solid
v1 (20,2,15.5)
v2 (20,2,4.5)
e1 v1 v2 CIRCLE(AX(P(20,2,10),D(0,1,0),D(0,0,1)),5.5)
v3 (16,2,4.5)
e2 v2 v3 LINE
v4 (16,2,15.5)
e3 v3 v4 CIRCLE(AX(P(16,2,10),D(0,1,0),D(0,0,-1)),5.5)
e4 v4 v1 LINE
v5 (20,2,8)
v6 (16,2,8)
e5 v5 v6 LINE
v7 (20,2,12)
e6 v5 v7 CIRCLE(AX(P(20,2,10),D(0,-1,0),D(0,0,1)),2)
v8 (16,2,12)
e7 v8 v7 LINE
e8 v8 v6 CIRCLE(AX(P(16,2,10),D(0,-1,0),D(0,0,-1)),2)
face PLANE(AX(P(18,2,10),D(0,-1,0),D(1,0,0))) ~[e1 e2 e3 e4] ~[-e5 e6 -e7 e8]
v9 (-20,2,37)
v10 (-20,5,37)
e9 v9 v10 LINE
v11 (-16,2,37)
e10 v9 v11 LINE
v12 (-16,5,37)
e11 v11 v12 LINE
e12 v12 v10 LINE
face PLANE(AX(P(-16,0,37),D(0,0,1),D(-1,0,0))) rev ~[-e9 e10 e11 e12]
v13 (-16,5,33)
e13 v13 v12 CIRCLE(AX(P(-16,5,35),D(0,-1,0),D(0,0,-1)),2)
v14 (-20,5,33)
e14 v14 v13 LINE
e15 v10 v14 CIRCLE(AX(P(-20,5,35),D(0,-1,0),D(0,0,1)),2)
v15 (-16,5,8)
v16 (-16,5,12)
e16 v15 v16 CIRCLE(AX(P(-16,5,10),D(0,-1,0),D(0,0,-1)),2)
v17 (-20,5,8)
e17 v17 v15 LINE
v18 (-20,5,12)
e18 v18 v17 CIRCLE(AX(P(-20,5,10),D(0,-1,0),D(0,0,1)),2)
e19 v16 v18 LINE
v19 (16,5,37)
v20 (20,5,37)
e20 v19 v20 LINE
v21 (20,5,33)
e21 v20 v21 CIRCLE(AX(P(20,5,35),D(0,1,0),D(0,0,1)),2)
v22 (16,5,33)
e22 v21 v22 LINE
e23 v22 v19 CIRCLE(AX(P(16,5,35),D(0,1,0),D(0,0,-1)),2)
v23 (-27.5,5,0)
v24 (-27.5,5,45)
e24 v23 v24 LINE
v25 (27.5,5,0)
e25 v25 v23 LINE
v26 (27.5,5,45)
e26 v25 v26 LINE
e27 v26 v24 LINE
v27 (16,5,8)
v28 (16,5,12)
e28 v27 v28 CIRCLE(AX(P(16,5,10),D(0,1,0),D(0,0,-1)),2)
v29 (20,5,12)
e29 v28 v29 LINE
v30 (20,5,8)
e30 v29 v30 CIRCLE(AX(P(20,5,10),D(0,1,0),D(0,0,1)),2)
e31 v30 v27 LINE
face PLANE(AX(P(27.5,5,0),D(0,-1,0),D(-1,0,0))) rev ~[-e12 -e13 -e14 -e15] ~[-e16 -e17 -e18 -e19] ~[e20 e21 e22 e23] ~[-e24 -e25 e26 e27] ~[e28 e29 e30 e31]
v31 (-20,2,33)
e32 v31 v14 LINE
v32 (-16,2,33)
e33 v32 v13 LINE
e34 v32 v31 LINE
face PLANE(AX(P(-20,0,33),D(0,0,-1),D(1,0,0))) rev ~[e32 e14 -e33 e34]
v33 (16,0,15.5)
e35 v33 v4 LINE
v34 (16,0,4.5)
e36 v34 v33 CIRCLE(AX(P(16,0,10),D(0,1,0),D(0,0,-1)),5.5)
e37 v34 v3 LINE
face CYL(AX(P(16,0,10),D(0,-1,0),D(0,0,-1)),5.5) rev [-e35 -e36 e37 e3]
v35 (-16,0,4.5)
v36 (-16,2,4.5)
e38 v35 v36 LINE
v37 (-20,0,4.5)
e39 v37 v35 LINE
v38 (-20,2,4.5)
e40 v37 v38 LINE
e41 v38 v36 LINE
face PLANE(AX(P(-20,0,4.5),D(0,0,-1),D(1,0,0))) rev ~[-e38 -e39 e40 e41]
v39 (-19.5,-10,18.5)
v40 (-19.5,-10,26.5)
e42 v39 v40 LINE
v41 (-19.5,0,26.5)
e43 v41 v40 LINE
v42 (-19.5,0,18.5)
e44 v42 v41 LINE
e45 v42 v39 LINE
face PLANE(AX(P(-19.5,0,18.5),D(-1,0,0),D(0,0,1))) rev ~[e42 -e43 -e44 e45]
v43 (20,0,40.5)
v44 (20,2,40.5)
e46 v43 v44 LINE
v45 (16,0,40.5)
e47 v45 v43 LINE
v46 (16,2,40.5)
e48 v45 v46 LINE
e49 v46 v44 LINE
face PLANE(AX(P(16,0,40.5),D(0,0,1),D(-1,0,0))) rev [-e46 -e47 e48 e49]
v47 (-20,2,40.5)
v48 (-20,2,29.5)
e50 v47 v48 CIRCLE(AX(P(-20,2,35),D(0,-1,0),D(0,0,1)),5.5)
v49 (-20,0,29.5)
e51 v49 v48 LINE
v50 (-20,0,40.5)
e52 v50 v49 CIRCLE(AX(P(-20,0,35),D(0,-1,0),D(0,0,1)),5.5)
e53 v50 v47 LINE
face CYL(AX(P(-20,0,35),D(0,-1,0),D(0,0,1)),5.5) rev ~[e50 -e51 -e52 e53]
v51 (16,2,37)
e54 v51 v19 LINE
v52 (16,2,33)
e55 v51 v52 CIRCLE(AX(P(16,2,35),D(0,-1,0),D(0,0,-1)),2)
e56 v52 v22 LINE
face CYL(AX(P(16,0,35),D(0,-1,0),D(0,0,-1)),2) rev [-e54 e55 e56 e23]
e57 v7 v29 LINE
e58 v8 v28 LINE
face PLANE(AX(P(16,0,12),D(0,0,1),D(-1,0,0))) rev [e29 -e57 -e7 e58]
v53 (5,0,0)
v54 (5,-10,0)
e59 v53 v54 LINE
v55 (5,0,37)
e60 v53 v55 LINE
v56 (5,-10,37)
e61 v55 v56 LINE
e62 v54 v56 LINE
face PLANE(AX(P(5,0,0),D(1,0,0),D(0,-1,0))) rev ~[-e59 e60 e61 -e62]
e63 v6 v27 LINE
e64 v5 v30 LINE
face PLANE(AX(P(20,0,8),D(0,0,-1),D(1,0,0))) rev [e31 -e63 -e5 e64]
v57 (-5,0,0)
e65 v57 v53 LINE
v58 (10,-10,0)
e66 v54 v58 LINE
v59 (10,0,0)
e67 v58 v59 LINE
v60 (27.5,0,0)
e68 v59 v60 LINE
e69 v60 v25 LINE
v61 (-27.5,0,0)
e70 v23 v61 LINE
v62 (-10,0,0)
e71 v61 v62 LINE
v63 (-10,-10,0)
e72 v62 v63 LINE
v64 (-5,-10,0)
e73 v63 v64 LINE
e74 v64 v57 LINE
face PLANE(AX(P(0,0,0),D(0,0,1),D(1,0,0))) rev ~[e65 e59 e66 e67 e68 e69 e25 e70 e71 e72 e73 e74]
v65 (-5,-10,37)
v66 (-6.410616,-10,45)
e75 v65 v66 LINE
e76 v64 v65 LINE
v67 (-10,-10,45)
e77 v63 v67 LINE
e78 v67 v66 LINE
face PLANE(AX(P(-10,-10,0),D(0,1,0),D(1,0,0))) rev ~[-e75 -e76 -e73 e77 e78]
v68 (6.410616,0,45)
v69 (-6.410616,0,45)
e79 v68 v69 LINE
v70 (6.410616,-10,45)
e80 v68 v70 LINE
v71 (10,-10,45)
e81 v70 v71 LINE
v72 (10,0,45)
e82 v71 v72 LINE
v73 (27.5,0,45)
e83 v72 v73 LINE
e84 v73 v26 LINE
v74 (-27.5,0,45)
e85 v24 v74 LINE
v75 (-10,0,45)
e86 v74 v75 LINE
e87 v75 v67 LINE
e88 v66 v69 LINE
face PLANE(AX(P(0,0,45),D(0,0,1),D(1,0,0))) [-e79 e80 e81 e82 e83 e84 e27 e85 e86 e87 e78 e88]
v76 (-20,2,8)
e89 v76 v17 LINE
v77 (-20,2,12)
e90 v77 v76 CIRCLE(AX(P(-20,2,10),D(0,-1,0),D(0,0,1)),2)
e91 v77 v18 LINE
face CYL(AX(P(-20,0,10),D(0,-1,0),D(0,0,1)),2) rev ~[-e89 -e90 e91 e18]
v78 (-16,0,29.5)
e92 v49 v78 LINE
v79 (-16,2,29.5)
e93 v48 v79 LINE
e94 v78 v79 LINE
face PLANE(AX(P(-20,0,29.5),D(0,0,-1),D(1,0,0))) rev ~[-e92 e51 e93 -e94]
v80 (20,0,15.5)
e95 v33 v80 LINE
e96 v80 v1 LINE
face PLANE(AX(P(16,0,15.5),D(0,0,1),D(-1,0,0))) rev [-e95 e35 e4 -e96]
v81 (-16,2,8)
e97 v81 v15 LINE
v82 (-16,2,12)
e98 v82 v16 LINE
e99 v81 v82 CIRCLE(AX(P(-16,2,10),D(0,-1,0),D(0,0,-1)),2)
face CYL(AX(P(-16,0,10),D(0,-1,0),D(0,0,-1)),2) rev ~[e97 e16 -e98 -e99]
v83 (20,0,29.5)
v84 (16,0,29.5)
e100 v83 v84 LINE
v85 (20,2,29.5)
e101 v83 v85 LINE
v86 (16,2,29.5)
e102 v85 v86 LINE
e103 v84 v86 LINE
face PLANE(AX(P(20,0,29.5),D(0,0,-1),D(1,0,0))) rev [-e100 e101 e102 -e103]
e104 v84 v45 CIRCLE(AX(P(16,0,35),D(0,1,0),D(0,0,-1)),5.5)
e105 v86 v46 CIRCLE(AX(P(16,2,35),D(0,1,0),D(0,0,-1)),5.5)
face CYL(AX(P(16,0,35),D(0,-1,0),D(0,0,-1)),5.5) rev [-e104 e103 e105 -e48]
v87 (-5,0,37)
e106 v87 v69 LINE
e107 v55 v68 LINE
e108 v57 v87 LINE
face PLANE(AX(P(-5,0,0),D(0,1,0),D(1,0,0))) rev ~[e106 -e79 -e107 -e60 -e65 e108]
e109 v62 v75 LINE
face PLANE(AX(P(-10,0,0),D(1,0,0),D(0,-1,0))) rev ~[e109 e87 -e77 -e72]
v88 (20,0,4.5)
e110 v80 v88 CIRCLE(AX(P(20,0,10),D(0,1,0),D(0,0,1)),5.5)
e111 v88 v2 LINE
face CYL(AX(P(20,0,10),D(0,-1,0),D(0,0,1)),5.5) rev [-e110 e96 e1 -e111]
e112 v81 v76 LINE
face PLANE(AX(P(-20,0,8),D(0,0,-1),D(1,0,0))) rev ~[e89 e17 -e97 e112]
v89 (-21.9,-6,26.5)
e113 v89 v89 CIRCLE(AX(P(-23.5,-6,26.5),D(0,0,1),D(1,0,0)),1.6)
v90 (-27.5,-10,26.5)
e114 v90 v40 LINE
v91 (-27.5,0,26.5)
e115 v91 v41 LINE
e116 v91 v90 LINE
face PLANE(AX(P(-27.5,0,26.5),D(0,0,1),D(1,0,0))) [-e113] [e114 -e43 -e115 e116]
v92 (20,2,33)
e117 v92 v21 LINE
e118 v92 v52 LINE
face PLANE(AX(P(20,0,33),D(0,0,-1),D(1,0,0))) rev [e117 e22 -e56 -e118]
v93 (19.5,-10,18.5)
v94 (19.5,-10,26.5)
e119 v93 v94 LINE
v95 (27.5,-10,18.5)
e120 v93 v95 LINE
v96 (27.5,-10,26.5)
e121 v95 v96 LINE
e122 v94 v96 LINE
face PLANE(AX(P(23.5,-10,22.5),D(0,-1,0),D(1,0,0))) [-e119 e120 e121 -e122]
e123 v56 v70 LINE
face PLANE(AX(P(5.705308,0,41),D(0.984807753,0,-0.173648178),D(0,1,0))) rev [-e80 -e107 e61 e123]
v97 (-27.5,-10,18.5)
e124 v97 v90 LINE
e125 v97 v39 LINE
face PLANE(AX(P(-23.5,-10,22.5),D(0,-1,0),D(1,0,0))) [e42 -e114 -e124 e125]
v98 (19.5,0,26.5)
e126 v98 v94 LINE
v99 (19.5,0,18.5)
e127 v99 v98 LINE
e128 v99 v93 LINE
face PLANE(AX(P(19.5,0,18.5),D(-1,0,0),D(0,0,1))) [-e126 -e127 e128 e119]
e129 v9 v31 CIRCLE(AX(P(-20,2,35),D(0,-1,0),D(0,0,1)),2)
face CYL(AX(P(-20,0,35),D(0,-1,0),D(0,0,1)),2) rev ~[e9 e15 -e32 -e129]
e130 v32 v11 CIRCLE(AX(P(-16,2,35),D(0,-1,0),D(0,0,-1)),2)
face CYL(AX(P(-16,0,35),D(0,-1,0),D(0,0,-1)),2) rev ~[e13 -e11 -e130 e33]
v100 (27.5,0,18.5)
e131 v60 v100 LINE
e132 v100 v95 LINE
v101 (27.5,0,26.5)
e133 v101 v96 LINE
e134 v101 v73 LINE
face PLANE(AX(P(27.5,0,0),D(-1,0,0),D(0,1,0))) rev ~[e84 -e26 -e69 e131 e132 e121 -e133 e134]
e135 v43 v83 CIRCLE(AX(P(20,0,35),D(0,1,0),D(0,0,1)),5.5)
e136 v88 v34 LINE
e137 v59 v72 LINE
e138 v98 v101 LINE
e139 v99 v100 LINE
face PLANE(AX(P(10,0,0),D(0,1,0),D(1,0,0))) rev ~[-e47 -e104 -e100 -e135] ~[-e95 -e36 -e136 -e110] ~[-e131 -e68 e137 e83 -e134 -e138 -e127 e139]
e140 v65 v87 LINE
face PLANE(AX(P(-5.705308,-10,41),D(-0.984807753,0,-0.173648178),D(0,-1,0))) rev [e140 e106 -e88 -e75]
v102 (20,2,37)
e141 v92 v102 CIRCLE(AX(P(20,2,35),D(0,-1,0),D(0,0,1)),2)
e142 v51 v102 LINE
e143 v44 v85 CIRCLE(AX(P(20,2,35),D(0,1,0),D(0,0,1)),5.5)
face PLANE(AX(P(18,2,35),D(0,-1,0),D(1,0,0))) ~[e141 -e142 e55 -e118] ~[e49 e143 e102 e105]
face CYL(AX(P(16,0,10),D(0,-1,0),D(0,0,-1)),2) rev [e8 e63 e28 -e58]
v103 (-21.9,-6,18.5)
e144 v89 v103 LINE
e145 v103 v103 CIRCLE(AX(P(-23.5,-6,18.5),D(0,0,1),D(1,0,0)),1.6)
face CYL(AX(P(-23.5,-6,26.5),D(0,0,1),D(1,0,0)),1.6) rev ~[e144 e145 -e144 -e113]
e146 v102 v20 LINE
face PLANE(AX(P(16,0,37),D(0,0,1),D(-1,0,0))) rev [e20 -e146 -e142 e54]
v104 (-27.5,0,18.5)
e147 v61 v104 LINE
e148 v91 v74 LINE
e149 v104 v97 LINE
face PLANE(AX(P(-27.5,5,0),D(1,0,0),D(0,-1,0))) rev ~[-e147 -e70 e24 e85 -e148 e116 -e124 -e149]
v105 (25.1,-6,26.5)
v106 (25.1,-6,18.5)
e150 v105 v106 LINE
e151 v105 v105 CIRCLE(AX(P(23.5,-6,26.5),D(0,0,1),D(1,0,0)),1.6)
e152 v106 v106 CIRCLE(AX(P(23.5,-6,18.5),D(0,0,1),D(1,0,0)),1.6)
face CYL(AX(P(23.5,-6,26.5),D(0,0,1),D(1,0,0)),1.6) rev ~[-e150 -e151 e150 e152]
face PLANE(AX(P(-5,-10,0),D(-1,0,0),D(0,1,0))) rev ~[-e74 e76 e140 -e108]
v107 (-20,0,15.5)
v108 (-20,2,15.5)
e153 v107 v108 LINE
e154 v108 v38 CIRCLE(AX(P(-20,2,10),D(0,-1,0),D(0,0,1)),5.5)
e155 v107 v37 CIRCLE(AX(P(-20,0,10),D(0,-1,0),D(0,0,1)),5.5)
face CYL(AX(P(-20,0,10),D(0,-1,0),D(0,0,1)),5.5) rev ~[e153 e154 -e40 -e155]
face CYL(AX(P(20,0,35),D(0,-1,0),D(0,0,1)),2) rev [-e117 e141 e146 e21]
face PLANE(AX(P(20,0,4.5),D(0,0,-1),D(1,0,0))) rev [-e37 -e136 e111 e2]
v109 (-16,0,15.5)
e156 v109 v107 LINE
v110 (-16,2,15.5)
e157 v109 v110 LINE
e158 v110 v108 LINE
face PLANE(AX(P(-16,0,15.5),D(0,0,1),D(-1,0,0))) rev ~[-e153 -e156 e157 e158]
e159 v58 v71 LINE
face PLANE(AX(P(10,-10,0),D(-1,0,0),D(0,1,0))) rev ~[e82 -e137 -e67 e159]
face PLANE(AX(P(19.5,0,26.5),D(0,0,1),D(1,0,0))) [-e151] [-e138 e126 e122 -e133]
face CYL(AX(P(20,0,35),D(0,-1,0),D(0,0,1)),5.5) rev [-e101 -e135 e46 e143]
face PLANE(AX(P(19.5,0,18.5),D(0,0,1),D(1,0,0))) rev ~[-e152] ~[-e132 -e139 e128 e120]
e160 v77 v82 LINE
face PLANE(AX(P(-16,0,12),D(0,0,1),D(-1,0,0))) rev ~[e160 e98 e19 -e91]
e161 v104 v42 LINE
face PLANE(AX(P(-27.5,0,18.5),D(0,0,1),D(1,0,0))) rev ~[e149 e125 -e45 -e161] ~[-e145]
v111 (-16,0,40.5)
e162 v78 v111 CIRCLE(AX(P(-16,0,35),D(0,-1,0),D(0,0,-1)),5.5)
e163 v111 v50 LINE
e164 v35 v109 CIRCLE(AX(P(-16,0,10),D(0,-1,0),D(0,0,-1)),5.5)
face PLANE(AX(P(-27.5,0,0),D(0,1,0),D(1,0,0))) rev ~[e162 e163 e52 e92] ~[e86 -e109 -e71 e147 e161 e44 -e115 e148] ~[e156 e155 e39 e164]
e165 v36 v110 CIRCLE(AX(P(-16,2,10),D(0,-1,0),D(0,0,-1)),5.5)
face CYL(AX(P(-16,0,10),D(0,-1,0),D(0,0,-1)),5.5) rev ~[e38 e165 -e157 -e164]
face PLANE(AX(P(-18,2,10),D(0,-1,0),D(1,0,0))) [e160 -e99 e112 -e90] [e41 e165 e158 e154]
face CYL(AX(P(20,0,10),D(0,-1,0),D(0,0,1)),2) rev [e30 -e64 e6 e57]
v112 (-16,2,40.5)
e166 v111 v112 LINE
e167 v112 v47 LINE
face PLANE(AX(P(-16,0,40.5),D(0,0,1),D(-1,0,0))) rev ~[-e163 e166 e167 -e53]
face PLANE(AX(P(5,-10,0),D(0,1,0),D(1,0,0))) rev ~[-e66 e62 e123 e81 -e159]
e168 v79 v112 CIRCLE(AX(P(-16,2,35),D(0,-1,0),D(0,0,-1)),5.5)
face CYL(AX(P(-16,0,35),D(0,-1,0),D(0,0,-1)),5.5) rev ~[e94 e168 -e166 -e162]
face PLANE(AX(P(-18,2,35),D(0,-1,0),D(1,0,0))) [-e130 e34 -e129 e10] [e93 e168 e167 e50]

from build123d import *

# Parameters (mm, degrees)
F1_DEPTH   = 45
F3_DEPTH   = 5
F5_DEPTH   = 2
F6_SIZE2   = 1.4106158457
F6_SIZE    = 8
F6_2_SIZE2 = 1.4106158457
F6_2_SIZE  = 8
F7_W       = 8
F7_H       = 8
F8_DEPTH   = 10
F9_R       = 1.6
F10_DEPTH  = 8


# Not quite as in the source:
# - a pattern or mirror of a feature is missing from the dataset's text; its kind, count and spacing are read off the source's solid


with BuildPart() as f1:
    # F0 (on Top) → F1 (new body)
    with BuildSketch(Plane.XY):
        Polygon((-5, -10), (-5, 0), (5, 0), (5, -10), (10, -10), (10, 0), (27.5, 0), (27.5, 5), (-27.5, 5), (-27.5, 0), (-10, 0), (-10, -10), align=None)
    extrude(amount=F1_DEPTH)

    # F2 (on face) → F3 (cut, through all)
    with BuildSketch(Plane.XZ):
        with BuildLine():
            Line((-16, 37), (-20, 37))
            ThreePointArc((-20, 37), (-22, 35), (-20, 33))
            Line((-20, 33), (-16, 33))
            ThreePointArc((-16, 33), (-14, 35), (-16, 37))
        make_face()
        with BuildLine():
            Line((-20, 8), (-16, 8))
            ThreePointArc((-16, 8), (-14, 10), (-16, 12))
            Line((-16, 12), (-20, 12))
            ThreePointArc((-20, 12), (-22, 10), (-20, 8))
        make_face()
    f3 = extrude(amount=-F3_DEPTH, mode=Mode.SUBTRACT)

    # F3_copies: F3 across plane
    add(f3.mirror(Plane(origin=(0, 0, 0), x_dir=(0, 0, 1), z_dir=(1, 0, 0))), mode=Mode.SUBTRACT)

    # F4 (on face) → F5 (cut)
    with BuildSketch(Plane.XZ):
        with BuildLine():
            Line((-16, 40.5), (-20, 40.5))
            ThreePointArc((-20, 40.5), (-25.5, 35), (-20, 29.5))
            Line((-20, 29.5), (-16, 29.5))
            ThreePointArc((-16, 29.5), (-10.5, 35), (-16, 40.5))
        make_face()
        with BuildLine():
            Line((-16, 15.5), (-20, 15.5))
            ThreePointArc((-20, 15.5), (-25.5, 10), (-20, 4.5))
            Line((-20, 4.5), (-16, 4.5))
            ThreePointArc((-16, 4.5), (-10.5, 10), (-16, 15.5))
        make_face()
    f5 = extrude(amount=-F5_DEPTH, mode=Mode.SUBTRACT)

    # F5_copies: F5 across plane
    add(f5.mirror(Plane(origin=(0, 0, 0), x_dir=(0, 0, 1), z_dir=(1, 0, 0))), mode=Mode.SUBTRACT)

    # F6
    f6_edges = [f1.edges().sort_by_distance(p)[0] for p in [
        (-5, -5, 45),
    ]]
    f6_side = f1.faces().sort_by_distance((-5, -5, 22.5))[0]
    chamfer(f6_edges, length=F6_SIZE, length2=F6_SIZE2, reference=f6_side)

    # F6#2
    f6_2_edges = [f1.edges().sort_by_distance(p)[0] for p in [
        (5, -5, 45),
    ]]
    f6_2_side = f1.faces().sort_by_distance((5, -5, 22.5))[0]
    chamfer(f6_2_edges, length=F6_2_SIZE, length2=F6_2_SIZE2, reference=f6_2_side)

    # F7 (on face) → F8 (join)
    with BuildSketch(Plane.XZ):
        with Locations((-23.5, 22.5)):
            Rectangle(F7_W, F7_H)
        with Locations((23.5, 22.5)):
            Rectangle(F7_W, F7_H)
    extrude(amount=F8_DEPTH)

    # F9 (on face) → F10 (cut, through all)
    with BuildSketch(Plane.XY.offset(26.5)):
        with Locations((-23.5, -6)):
            Circle(F9_R)
        with Locations((23.5, -6)):
            Circle(F9_R)
    extrude(amount=-F10_DEPTH, mode=Mode.SUBTRACT)


solid = f1.part
